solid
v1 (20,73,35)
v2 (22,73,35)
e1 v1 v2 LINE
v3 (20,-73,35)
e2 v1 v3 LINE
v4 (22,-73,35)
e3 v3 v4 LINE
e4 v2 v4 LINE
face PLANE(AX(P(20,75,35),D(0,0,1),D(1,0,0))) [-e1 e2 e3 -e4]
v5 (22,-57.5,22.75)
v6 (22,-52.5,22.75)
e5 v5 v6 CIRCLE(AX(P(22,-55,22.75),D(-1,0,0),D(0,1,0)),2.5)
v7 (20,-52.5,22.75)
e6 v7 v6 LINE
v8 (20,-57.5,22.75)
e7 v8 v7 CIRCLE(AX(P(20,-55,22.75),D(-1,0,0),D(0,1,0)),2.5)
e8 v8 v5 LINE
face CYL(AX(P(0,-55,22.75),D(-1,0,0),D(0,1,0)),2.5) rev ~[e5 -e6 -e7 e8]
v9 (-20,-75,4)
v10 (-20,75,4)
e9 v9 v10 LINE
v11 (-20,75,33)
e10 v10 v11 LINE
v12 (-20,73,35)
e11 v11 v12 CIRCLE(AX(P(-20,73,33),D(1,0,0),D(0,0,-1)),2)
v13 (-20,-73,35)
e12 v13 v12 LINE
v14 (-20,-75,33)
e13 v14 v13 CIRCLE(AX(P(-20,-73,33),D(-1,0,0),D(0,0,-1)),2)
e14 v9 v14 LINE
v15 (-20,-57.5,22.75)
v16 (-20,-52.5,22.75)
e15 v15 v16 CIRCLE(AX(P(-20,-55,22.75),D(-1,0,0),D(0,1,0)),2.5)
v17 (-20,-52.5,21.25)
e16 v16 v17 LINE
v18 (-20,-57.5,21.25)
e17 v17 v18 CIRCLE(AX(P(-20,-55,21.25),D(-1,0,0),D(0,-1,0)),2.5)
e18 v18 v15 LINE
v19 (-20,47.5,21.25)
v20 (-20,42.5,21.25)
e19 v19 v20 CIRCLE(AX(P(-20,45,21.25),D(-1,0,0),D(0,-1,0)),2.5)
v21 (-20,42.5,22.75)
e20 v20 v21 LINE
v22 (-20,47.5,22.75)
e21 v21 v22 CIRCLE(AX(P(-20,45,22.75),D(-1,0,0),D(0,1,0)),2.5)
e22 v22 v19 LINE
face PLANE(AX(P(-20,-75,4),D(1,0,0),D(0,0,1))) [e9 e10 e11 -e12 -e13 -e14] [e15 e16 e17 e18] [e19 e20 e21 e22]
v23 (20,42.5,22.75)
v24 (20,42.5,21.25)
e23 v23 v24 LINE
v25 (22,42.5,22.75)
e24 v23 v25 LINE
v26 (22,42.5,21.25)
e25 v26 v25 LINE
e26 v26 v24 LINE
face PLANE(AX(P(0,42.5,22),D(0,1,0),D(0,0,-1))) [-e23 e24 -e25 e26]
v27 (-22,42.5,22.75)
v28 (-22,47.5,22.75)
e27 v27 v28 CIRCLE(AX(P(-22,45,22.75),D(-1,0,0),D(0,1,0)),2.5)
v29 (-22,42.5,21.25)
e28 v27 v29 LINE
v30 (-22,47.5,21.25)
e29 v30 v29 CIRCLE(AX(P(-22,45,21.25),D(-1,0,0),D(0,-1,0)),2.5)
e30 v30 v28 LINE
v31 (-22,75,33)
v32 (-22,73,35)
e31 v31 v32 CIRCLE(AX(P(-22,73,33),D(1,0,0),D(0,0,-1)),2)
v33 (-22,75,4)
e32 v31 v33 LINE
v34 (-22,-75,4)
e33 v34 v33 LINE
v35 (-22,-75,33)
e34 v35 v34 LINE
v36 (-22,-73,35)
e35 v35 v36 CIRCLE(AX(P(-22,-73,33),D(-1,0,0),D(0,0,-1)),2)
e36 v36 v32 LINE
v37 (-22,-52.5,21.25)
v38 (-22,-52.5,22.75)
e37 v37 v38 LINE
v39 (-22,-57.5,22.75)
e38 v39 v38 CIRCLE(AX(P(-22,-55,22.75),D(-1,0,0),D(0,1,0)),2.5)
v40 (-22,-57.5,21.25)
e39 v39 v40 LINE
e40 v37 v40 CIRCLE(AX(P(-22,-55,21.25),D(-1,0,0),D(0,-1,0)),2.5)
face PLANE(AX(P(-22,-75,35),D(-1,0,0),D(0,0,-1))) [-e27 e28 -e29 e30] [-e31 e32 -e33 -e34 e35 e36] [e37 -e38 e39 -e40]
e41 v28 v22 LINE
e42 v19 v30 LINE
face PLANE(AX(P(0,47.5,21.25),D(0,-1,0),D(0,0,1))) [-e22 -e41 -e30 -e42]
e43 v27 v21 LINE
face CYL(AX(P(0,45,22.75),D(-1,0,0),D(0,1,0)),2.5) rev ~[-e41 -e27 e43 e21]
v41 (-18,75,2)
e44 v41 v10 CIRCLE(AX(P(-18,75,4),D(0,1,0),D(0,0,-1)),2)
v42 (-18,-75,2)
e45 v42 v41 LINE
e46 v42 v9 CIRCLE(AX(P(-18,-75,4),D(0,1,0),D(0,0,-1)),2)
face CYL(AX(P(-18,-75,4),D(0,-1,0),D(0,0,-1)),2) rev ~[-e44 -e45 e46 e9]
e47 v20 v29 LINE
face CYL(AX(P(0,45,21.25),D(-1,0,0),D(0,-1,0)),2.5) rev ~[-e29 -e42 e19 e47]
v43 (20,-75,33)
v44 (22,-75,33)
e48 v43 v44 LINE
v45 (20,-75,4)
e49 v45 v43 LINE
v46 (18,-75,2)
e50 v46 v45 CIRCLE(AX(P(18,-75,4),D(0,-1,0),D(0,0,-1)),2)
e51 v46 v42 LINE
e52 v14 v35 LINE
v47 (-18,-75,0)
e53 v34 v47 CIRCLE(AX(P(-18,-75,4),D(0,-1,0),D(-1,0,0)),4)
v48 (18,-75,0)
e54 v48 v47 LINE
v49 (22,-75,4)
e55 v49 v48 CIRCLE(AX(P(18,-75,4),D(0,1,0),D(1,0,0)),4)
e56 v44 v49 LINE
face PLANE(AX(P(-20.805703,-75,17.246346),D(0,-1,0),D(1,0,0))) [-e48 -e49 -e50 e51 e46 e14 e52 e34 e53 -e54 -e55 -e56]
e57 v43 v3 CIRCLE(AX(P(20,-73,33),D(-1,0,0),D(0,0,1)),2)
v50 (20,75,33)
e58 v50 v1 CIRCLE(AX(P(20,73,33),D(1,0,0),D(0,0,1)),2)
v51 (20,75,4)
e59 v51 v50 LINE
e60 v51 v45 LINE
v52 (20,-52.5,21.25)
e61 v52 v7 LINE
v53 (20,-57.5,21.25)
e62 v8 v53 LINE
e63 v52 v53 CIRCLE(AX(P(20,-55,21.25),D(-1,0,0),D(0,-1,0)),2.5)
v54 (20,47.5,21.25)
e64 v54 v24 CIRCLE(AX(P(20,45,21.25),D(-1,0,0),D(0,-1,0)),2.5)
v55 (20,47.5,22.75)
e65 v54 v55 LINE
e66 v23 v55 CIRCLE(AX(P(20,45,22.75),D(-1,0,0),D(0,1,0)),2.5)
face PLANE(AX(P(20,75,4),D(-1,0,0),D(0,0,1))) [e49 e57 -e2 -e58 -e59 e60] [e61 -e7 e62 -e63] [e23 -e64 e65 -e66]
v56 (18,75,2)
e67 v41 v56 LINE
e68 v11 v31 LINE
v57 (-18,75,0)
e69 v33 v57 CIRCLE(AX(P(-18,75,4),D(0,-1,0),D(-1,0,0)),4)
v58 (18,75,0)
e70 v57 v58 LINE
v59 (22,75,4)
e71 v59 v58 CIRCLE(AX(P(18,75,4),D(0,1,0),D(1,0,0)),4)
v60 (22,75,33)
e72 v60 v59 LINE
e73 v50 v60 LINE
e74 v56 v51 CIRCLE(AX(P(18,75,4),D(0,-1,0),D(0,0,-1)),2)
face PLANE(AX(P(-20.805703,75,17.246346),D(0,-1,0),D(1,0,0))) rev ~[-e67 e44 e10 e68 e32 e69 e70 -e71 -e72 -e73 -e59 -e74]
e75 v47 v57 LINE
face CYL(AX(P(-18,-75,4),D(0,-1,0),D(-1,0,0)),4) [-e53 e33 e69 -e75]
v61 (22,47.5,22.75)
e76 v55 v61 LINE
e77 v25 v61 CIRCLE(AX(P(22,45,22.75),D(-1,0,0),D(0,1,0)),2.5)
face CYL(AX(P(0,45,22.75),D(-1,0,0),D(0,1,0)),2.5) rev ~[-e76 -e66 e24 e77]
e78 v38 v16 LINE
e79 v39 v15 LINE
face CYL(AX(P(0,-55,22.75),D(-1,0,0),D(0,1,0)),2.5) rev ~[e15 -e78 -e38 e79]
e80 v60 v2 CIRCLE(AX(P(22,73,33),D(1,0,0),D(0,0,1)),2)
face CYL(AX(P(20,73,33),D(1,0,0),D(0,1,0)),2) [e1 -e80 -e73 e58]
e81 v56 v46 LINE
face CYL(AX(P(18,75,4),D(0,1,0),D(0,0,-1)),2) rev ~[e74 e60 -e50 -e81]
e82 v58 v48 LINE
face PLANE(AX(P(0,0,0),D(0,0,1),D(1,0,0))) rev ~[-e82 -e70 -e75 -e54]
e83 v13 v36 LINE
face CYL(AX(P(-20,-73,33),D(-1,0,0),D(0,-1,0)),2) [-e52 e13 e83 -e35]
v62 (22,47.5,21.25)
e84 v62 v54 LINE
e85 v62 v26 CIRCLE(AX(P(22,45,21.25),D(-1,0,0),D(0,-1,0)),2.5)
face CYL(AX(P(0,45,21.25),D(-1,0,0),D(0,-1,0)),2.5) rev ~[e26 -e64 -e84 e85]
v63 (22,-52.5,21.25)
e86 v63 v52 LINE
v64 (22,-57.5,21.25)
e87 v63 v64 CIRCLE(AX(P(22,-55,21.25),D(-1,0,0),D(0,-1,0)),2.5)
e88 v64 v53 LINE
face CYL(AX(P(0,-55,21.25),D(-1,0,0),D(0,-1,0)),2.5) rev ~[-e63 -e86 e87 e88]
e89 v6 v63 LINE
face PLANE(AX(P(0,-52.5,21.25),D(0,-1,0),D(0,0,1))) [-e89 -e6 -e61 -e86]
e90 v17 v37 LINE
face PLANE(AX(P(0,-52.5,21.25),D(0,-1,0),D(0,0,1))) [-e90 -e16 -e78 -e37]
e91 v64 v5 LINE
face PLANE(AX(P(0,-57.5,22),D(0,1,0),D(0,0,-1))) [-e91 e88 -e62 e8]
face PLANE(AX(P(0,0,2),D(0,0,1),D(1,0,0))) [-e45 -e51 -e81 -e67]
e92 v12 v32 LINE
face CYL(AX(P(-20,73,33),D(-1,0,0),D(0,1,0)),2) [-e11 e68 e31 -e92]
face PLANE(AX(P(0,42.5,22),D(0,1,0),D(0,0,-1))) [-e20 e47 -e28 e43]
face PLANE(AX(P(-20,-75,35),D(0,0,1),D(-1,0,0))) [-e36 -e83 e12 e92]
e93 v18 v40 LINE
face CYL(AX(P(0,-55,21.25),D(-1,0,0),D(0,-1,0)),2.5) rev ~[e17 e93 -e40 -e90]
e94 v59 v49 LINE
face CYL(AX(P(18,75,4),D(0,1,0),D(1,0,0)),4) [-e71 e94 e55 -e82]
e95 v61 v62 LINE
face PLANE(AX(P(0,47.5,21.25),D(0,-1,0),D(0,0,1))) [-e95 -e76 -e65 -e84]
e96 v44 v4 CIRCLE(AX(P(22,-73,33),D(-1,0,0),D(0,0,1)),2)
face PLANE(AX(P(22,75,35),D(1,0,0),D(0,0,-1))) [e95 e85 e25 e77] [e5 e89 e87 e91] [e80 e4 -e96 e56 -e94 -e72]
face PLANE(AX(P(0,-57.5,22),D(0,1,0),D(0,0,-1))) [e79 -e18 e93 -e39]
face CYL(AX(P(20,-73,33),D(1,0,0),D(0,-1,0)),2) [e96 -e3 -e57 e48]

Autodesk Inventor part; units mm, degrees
ref_plane "YZ Plane" through (0, 0, 0) normal (1, 0, 0) x (0, 1, 0)
ref_plane "XZ Plane" through (0, 0, 0) normal (0, 1, 0) x (-1, 0, 0)
ref_plane "XY Plane" through (0, 0, 0) normal (0, 0, 1) x (1, 0, 0)
sketch "Sketch1" plane through (0, 0, 0) normal (0, 0, 1) x (1, 0, 0)
  line L0 (-20, 75) -> (20, 75)
  line L1 (20, 75) -> (20, -75)
  line L2 (20, -75) -> (-20, -75)
  line L3 (-20, -75) -> (-20, 75)
  line L4 (-20, 75) -> (20, -75) construction
  line L5 (20, 75) -> (-20, -75) construction
  point P0 (0, 0)
  point P1 (0, 0)
  dimension "d0" = 40
  dimension "d1" = 150
extrude "Plate1" add sketch "Sketch1" along normal blind 2
sketch "Sketch2" plane through (-20, -75, 2) normal (-1, 0, 0) x (0, -1, 0)
  line L0 (-150, 0) -> (0, 0)
  line L1 (0, 0) -> (0, 33)
  line L2 (0, 33) -> (-150, 33)
  line L3 (-150, 33) -> (-150, 0)
edge flange "Flange1" height 35 angle 90 thickness 2 bend radius 2 thickness toward (-1, 0, 0) relief tear relief width 2 relief depth 1 corner gap 2 corner form 0 edges at (-20, 0, 2) (20, 0, 2) wall of the first edge with corners at (-20, 75, 2) (-20, -75, 2) (-20, -75, 35) (-20, 75, 35)
bend "Bend1"
corner "Corner1"
sketch "Sketch3" plane through (0, 0, 0) normal (1, 0, 0) x (0, 1, 0)
  line L0 (-75, 4) -> (75, 4) projected
  line L1 (75, 35) -> (75, 4) projected
  line L2 (-75, 35) -> (75, 35) projected
  line L3 (-75, 4) -> (-75, 35) projected
  circle A0 centre (-55, 22) radius 2.5
  line L4 (-55, 22.75) -> (-55, 21.25) construction
  line L5 (-57.5, 22.75) -> (-57.5, 21.25)
  line L6 (-52.5, 21.25) -> (-52.5, 22.75)
  arc A1 (-52.5, 22.75) -> (-57.5, 22.75) centre (-55, 22.75) ccw
  arc A2 (-57.5, 21.25) -> (-52.5, 21.25) centre (-55, 21.25) ccw
  point P0 (0, 0)
  point P1 (-52.5, 22)
  point P2 (-57.5, 22)
  dimension "d13" = 5
  dimension "d14" = 13
  dimension "d15" = 20
  dimension "d29" = 1.5
extrude "Extrusion1" cut sketch "Sketch3" along normal through all both and the other way through all contours A0 | L6 A2 L5 A0 | A0 L5 A1 L6
pattern_linear "Rectangular Pattern2" count 2 spacing 100 along (0, 1, 0) of "Extrusion1"
fillet "Fillet1" radius 2 4 edges at (-21, -75, 35) (21, -75, 35) (-21, 75, 35) (21, 75, 35)
equation "\"d2\" = Thickness"
equation "\"d3\" = BendReliefWidth"
equation "\"d4\" = BendReliefDepth"
equation "\"d5\" = MinimumRemnant"
equation "\"d6\" = TransitionRadius"
equation "\"d9\" = BendRadius"
equation "\"d10\" = CornerReliefSize"
equation "\"d11\" = GapSize"
equation "\"d12\" = JacobiRadiusSize"
equation "\"BendRadius\" = Thickness"
equation "\"BendReliefWidth\" = Thickness"
equation "\"BendReliefDepth\" = 0.5 * Thickness"
equation "\"CornerReliefSize\" = 4 * Thickness"
equation "\"MinimumRemnant\" = 2 * Thickness"
equation "\"TransitionRadius\" = BendRadius"
equation "\"JacobiRadiusSize\" = BendRadius"
equation "\"GapSize\" = Thickness"
equation "\"Thickness\" = 2"
properties part number "NDM 7.44 bracket middle" material "Stainless Steel"
